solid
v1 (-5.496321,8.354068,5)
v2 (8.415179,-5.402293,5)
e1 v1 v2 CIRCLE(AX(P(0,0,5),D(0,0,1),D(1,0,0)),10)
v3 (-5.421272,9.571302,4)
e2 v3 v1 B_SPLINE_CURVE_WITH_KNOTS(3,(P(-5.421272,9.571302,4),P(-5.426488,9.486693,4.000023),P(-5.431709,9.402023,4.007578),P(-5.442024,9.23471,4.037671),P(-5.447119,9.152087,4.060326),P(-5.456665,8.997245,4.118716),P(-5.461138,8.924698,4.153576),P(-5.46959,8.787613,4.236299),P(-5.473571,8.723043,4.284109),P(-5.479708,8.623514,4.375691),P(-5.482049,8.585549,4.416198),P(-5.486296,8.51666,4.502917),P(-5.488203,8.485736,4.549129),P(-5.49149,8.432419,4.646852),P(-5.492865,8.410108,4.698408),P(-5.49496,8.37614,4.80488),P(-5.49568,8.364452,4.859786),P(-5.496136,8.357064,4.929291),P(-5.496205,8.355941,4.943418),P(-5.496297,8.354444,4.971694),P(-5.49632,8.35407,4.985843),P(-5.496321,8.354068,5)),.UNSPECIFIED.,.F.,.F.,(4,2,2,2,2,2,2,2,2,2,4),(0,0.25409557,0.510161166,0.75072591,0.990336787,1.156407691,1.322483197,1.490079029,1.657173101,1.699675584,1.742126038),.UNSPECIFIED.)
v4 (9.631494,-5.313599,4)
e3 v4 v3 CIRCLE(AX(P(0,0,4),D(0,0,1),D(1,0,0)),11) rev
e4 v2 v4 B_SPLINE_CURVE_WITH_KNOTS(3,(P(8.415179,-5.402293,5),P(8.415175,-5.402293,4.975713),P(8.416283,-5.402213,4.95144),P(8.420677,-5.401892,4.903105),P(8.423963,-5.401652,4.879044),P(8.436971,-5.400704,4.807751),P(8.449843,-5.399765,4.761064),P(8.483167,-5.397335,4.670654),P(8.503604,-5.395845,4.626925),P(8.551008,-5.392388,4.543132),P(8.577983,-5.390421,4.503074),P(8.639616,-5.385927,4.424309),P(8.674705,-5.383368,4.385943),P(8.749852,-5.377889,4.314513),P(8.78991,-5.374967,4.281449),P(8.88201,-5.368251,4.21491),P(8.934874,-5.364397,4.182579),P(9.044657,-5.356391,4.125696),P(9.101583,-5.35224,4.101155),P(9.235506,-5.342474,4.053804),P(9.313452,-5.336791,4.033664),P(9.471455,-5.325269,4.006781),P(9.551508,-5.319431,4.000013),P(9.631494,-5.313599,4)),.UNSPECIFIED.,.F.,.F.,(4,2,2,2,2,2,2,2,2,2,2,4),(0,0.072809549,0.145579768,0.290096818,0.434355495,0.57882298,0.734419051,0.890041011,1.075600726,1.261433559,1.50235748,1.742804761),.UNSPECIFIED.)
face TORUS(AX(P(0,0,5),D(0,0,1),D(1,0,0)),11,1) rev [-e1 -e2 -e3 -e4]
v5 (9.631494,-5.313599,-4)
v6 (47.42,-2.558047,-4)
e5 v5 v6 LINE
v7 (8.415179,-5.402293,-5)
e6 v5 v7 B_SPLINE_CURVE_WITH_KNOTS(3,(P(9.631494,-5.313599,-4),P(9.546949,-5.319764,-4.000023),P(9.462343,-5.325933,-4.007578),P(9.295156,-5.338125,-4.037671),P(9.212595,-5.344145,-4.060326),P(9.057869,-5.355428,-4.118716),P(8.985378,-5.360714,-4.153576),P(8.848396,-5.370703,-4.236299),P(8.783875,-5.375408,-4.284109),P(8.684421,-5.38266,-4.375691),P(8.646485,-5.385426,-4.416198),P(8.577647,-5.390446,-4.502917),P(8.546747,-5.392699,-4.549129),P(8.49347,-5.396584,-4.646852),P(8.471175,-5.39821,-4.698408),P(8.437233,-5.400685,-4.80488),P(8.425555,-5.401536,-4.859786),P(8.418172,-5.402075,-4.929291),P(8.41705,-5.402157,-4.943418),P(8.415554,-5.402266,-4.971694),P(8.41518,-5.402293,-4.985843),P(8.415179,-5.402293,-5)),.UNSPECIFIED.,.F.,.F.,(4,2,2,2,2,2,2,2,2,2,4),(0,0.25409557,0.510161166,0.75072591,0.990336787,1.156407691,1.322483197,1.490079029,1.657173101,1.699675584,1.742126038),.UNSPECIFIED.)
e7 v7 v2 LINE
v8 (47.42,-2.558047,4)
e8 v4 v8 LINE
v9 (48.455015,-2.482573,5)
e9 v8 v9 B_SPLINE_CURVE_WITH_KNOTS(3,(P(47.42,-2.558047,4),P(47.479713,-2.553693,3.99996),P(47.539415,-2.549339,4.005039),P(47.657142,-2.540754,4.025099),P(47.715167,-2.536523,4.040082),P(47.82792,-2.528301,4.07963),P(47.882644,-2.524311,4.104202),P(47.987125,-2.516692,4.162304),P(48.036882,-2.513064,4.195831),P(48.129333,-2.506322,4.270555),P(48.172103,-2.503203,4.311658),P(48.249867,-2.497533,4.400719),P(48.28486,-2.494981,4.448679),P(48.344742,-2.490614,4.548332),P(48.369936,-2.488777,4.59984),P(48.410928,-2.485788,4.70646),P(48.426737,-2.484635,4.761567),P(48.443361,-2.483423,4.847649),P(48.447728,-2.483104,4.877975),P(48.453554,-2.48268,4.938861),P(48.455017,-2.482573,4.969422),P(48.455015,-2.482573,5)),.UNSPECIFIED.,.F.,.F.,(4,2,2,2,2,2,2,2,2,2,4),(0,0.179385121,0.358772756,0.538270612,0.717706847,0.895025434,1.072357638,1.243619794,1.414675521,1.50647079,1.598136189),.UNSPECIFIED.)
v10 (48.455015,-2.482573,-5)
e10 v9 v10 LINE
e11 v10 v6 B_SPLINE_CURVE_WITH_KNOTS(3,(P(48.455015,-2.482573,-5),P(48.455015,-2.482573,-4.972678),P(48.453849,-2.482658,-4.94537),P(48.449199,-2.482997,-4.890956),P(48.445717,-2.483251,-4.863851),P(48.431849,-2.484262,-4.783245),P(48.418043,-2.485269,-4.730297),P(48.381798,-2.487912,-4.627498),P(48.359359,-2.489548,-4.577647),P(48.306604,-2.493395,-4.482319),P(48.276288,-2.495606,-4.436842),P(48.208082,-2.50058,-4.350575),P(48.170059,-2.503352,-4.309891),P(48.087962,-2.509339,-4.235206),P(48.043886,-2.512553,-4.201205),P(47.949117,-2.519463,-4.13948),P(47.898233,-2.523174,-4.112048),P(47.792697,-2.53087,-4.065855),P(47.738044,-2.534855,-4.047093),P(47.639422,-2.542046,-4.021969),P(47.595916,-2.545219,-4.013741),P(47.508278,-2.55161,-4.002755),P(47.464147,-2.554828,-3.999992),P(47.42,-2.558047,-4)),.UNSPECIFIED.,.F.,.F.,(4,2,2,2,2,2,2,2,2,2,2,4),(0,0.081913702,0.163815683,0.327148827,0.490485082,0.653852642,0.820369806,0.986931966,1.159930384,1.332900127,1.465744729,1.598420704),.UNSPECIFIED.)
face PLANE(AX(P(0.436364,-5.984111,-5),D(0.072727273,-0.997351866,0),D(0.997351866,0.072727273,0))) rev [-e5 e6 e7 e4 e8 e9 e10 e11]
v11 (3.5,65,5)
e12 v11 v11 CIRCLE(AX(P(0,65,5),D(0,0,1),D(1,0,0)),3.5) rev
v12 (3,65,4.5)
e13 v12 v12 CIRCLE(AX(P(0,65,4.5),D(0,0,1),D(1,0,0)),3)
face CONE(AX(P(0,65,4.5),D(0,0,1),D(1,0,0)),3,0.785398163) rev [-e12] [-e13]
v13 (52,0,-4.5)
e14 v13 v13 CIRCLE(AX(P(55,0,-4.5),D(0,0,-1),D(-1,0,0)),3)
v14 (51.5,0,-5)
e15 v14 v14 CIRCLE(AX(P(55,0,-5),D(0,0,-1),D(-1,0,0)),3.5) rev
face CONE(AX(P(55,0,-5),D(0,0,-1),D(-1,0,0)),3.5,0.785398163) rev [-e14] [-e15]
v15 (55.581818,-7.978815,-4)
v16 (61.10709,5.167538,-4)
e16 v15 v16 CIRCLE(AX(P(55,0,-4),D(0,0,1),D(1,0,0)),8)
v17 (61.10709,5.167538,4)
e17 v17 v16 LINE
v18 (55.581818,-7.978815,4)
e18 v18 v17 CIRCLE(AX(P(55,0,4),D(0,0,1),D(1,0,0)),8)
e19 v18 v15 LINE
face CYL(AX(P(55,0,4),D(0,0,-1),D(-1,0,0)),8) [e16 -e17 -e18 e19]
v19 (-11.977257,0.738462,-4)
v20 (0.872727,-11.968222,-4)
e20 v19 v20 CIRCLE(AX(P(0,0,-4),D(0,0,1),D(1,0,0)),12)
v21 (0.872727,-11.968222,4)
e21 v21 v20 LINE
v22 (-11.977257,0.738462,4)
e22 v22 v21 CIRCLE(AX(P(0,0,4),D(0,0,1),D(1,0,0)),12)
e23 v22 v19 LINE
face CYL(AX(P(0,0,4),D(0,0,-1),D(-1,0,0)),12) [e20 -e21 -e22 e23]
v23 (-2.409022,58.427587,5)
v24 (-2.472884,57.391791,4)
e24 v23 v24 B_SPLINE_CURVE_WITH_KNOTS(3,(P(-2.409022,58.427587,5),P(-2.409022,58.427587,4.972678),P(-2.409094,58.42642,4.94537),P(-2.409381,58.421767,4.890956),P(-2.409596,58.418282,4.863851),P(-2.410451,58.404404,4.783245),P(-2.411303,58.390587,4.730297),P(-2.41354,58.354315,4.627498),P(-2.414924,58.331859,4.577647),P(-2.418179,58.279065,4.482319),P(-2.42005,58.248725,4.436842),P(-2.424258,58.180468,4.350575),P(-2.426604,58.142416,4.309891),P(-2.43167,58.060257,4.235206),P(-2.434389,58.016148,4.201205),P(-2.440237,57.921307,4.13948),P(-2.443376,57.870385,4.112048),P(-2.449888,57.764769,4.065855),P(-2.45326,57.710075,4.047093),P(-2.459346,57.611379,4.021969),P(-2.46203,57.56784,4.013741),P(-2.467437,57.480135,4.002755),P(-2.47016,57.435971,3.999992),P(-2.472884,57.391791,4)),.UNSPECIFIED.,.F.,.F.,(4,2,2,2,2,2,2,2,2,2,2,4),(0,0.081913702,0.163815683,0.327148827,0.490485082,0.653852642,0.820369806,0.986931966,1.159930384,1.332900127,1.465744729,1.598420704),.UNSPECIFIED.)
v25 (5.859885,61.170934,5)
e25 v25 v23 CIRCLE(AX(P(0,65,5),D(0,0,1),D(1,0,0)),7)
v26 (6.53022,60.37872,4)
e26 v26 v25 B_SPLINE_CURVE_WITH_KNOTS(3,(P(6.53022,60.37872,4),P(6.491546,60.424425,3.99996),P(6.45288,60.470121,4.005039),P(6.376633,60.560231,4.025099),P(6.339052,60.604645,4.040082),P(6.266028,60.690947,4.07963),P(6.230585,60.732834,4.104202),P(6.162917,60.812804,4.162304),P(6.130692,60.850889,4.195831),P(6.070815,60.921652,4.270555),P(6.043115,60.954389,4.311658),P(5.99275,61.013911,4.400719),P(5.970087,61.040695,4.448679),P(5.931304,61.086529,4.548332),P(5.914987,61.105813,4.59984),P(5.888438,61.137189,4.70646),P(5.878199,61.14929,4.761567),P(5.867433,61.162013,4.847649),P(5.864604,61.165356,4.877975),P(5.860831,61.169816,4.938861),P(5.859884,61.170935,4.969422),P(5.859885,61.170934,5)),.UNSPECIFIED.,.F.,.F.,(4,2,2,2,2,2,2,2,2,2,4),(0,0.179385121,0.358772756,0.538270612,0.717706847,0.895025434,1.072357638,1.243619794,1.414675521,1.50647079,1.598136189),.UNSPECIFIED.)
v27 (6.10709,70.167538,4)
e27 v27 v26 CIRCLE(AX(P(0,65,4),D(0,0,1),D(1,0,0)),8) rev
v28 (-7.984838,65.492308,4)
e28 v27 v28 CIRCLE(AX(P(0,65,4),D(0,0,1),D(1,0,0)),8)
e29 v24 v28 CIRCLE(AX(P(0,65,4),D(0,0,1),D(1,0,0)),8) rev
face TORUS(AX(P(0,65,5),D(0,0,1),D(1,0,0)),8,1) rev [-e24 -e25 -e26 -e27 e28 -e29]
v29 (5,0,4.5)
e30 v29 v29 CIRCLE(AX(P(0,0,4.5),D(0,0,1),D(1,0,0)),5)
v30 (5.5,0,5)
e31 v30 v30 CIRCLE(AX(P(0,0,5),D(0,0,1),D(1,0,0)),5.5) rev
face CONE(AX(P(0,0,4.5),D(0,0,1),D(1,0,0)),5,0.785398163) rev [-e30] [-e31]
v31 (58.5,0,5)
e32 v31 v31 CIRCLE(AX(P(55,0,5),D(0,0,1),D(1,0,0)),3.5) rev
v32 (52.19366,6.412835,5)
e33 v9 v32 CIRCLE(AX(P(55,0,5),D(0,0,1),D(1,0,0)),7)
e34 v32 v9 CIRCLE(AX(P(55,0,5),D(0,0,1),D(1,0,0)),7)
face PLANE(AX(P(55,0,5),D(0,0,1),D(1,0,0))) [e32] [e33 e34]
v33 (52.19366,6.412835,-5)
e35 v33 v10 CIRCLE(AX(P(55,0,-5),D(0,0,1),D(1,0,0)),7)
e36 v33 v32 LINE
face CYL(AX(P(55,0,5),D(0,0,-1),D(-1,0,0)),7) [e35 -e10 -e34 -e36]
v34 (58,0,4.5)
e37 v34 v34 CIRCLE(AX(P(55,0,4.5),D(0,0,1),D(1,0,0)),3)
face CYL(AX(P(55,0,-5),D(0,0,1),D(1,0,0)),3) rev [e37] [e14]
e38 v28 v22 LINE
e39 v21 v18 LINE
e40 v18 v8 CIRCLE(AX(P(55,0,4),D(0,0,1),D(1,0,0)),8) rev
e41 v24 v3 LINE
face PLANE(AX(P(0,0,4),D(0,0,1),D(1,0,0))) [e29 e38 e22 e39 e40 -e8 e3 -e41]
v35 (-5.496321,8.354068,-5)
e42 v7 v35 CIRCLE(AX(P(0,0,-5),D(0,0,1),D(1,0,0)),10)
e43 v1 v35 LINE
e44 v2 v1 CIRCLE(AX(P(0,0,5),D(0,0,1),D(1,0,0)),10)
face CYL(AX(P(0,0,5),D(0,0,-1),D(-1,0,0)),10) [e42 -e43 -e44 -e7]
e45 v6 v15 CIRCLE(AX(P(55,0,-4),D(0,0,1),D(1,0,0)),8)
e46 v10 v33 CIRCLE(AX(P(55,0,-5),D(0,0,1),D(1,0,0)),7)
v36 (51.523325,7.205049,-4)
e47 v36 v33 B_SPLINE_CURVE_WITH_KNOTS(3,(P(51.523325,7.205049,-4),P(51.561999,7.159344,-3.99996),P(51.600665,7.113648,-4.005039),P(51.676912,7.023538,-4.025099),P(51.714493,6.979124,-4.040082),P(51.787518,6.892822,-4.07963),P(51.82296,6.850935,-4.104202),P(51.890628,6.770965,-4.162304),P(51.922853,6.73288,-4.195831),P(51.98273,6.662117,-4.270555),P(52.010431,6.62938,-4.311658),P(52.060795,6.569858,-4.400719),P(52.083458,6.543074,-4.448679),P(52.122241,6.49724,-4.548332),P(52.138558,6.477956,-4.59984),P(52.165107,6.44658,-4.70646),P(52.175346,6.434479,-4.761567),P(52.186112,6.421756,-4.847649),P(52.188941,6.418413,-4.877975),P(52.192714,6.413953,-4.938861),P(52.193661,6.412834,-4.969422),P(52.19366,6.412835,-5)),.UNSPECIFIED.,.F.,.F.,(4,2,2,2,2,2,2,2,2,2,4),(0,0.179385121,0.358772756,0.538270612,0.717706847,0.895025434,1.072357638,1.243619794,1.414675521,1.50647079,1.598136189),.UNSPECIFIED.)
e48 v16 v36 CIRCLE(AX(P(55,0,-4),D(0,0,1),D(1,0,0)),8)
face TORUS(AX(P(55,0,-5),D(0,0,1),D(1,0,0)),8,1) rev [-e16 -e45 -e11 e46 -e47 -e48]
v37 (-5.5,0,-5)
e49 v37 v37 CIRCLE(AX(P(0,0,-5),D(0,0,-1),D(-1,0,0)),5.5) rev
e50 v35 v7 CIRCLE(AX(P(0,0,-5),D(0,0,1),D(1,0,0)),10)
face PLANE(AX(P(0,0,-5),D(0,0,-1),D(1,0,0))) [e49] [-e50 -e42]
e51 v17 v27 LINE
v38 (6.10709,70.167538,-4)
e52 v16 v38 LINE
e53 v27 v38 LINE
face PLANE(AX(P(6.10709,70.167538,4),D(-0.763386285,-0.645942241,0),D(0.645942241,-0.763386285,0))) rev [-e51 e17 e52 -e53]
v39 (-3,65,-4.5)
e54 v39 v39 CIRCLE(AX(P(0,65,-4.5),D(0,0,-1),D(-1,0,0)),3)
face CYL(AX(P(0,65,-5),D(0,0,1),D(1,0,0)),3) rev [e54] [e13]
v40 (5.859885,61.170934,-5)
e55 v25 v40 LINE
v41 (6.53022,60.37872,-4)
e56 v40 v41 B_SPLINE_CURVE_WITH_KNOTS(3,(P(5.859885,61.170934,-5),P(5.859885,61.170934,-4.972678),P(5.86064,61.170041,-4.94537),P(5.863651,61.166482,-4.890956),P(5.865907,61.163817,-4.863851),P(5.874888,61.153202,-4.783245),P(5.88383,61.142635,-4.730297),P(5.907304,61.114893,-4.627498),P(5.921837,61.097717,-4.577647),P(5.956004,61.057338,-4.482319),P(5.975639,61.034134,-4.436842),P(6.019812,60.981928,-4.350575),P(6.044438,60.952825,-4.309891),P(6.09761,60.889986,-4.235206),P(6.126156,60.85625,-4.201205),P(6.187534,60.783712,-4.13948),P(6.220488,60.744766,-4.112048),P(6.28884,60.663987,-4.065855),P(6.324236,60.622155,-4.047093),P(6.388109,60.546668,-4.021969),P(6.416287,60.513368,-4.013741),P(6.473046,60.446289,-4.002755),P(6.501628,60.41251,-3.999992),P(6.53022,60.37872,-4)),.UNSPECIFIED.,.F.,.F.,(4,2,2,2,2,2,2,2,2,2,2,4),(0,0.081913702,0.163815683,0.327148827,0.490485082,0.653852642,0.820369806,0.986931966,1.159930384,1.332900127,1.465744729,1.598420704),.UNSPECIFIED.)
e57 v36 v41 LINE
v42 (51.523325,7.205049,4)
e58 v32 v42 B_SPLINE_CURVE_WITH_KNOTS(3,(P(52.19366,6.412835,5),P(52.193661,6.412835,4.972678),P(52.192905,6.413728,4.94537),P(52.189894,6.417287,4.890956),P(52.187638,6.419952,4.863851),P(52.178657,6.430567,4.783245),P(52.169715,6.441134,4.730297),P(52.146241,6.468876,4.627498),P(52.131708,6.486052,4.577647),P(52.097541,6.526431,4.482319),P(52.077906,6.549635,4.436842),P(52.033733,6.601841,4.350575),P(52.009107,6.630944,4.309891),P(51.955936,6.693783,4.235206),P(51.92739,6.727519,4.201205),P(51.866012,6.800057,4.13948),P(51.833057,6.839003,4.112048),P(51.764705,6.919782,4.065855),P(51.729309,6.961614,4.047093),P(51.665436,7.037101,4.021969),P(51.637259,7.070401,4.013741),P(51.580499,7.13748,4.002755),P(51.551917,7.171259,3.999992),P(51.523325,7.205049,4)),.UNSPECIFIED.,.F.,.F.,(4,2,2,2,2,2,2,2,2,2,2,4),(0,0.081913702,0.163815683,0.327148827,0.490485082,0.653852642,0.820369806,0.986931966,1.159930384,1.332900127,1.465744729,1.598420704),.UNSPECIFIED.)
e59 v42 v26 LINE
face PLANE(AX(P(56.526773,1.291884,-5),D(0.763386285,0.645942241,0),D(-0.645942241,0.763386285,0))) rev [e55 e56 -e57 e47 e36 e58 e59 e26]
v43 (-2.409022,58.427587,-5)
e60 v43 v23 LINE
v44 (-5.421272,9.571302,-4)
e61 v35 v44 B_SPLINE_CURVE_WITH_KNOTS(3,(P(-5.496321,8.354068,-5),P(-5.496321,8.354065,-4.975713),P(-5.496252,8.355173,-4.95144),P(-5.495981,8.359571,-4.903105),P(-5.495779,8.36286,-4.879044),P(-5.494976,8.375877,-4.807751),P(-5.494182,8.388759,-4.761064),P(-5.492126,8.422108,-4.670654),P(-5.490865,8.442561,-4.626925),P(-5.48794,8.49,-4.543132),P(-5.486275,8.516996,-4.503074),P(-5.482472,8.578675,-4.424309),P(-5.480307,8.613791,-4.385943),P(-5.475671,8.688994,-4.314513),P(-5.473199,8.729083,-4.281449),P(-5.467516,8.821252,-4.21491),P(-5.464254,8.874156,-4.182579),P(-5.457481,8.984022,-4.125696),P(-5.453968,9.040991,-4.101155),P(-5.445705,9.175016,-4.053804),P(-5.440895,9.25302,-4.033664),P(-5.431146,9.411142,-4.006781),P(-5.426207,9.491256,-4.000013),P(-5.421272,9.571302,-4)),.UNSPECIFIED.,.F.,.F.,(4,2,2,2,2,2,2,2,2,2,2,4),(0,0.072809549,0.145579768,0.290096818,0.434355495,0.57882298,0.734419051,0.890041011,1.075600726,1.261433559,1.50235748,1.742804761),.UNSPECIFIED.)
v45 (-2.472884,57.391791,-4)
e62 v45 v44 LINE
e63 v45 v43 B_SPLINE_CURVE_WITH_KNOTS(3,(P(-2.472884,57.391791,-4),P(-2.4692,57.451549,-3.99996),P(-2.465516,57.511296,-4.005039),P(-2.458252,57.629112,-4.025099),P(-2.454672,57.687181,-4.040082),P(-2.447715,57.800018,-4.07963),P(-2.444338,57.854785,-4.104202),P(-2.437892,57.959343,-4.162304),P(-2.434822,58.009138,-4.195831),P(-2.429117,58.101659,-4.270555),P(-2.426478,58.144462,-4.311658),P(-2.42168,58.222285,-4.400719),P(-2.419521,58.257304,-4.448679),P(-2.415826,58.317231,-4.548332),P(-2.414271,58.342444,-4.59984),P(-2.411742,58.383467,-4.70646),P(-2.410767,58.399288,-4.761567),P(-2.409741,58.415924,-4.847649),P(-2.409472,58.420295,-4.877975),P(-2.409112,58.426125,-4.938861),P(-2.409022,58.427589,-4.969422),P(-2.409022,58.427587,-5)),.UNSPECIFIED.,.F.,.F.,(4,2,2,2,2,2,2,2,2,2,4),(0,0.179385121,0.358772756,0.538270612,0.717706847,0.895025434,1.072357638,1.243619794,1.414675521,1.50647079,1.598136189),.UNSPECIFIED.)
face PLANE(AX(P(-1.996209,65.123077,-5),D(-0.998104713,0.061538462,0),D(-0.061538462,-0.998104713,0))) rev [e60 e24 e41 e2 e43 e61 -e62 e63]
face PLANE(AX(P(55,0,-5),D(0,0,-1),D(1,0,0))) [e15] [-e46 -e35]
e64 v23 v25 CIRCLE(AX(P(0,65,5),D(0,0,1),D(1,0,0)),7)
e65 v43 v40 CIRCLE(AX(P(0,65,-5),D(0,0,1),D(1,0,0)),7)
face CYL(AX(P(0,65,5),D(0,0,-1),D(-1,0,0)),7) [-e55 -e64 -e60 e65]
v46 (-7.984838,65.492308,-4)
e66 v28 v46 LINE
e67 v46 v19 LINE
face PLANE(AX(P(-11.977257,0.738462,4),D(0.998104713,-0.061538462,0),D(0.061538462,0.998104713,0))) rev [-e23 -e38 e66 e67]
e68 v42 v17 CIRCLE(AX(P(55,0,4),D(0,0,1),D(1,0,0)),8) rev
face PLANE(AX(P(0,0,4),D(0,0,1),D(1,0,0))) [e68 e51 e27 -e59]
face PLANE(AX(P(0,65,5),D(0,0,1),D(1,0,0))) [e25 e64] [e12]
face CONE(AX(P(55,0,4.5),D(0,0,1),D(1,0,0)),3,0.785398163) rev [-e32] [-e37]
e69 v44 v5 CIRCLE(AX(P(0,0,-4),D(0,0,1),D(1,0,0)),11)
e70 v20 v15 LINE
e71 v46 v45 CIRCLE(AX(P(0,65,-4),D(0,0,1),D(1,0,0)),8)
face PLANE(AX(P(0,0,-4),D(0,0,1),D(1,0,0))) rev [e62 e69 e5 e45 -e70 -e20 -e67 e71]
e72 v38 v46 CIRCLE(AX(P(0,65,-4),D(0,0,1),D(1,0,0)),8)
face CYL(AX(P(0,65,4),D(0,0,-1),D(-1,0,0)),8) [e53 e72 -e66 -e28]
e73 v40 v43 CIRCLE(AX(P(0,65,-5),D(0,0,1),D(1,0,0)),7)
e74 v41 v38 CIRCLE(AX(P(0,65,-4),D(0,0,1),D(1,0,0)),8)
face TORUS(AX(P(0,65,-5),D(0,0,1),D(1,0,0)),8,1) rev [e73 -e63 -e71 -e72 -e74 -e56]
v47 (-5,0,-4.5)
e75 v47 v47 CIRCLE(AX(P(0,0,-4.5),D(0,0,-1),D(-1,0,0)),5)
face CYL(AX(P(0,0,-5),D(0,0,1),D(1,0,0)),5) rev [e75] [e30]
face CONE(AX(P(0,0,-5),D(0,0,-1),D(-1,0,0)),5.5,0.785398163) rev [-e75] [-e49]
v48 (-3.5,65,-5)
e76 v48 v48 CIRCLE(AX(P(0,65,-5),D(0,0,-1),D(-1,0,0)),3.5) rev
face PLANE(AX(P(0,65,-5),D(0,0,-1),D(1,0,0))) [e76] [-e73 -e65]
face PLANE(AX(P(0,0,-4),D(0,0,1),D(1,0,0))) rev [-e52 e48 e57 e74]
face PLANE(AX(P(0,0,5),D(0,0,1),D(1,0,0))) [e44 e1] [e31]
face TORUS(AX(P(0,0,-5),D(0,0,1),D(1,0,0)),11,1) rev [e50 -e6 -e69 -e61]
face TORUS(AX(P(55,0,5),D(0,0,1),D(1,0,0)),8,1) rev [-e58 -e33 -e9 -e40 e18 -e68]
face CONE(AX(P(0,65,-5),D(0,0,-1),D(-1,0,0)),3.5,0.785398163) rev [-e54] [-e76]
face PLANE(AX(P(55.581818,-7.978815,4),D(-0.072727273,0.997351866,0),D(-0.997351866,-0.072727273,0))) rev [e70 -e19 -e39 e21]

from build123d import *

# Parameters (mm, degrees)
BOSS_EXTRUDE1_DEPTH     = 4
SKETCH2_R               = 10
SKETCH2_R_2             = 7
BOSS_EXTRUDE2_DEPTH     = 1
CUT_EXTRUDE1_DEPTH      = 97.555683416
CUT_EXTRUDE1_DEPTH_BACK = 97.555683416
FILLET4_R               = 1
SKETCH7_R               = 7
SKETCH7_R_2             = 10
BOSS_EXTRUDE4_DEPTH     = 10
CUT_EXTRUDE2_DEPTH      = 97.845237373
CUT_EXTRUDE2_DEPTH_BACK = 97.845237373
SKETCH5_R               = 5
SKETCH5_R_2             = 3
FILLET5_R               = 1
CHAMFER1_SIZE           = 0.5


with BuildPart() as part:
    # Sketch1 → Boss-Extrude1 (new, symmetric)
    with BuildSketch(Plane.XY):
        with BuildLine():
            Line((-11.977256554, 0.738461538), (-7.984837703, 65.492307692))
            ThreePointArc((-7.984837703, 65.492307692), (-2.5191126, 72.593027835), (6.107090283, 70.167537932))
            Line((6.107090283, 70.167537932), (61.107090283, 5.167537932))
            ThreePointArc((61.107090283, 5.167537932), (62.375094743, -3.099673778), (55.581818182, -7.978814925))
            Line((55.581818182, -7.978814925), (0.872727273, -11.968222387))
            ThreePointArc((0.872727273, -11.968222387), (-8.437570547, -8.53272543), (-11.977256554, 0.738461538))
        make_face()
    extrude(amount=BOSS_EXTRUDE1_DEPTH, both=True)

    # Sketch2 → Boss-Extrude2 (add, symmetric)
    with BuildSketch(Plane.XY.offset(4)):
        Circle(SKETCH2_R)
        with Locations((0, 65)):
            Circle(SKETCH2_R_2)
        with Locations((55, 0)):
            Circle(SKETCH2_R_2)
    boss_extrude2 = extrude(amount=BOSS_EXTRUDE2_DEPTH, both=True)

    # Mirror4: Boss-Extrude2 across plane
    add(boss_extrude2.mirror(Plane.XY))

    # Sketch4 → Cut-Extrude1 (cut, two sides: drawn at the far end of the back side and taken through both)
    with BuildSketch(Plane.XY.offset(-CUT_EXTRUDE1_DEPTH_BACK)):
        with BuildLine():
            Line((0.436363636, -5.984111194), (55.145454545, -1.994703731))
            ThreePointArc((55.145454545, -1.994703731), (56.843773686, -0.774918445), (56.526772571, 1.291884483))
            Line((56.526772571, 1.291884483), (1.526772571, 66.291884483))
            ThreePointArc((1.526772571, 66.291884483), (-0.62977815, 66.898256959), (-1.996209426, 65.123076923))
            Line((-1.996209426, 65.123076923), (-5.988628277, 0.369230769))
            ThreePointArc((-5.988628277, 0.369230769), (-4.218785273, -4.266362715), (0.436363636, -5.984111194))
        make_face()
    extrude(amount=CUT_EXTRUDE1_DEPTH + CUT_EXTRUDE1_DEPTH_BACK, mode=Mode.SUBTRACT)

    # Fillet4
    fillet4_edges = [part.edges().sort_by_distance(p)[0] for p in [
        (51.800234692, -2.23863842, 5),
        (54.360216429, 3.852359924, 5),
        (51.800234692, -2.23863842, -5),
        (54.360216429, 3.852359924, -5),
        (-2.2026157, 61.775331943, 5),
        (-2.2026157, 61.775331943, -5),
        (-4.218785273, -4.266362715, 5),
        (-4.218785273, -4.266362715, -5),
        (56.843773686, -0.774918445, 5),
        (56.843773686, -0.774918445, -5),
        (-0.62977815, 66.898256959, 5),
        (-0.62977815, 66.898256959, -5),
        (-5.742474431, 4.361649621, 5),
        (4.425771099, -5.693202103, 5),
        (-5.742474431, 4.361649621, -5),
        (4.425771099, -5.693202103, -5),
        (3.693328713, 63.731409042, 5),
        (3.693328713, 63.731409042, -5),
    ]]
    fillet(fillet4_edges, radius=FILLET4_R)

    # Sketch7 → Boss-Extrude4 (add)
    with BuildSketch(Plane.XY.offset(5)):
        with Locations((0, 65)):
            Circle(SKETCH7_R)
        Circle(SKETCH7_R_2)
        with Locations((55, 0)):
            Circle(SKETCH7_R)
    extrude(amount=-BOSS_EXTRUDE4_DEPTH)

    # Sketch5 → Cut-Extrude2 (cut, two sides: drawn at the far end of the back side and taken through both)
    with BuildSketch(Plane.XY.offset(4).offset(-CUT_EXTRUDE2_DEPTH_BACK)):
        Circle(SKETCH5_R)
        with Locations((55, 0)):
            Circle(SKETCH5_R_2)
        with Locations((0, 65)):
            Circle(SKETCH5_R_2)
    extrude(amount=CUT_EXTRUDE2_DEPTH + CUT_EXTRUDE2_DEPTH_BACK, mode=Mode.SUBTRACT)

    # Fillet5
    # the kernel refuses this fillet: 1 mm, written as the material it adds along each edge
    with BuildSketch(Plane(origin=(0, 0, 4), x_dir=(-0.3253741437230861, 0.9455853565894877, 0), z_dir=(0.9455853565894877, 0.3253741437230861, 0))) as fillet5_piece_1_section:
        with BuildLine():
            CenterArc((10 + FILLET5_R, FILLET5_R), FILLET5_R, 180, 90)
            Line((10 + FILLET5_R, 0), (10, 0))
            Line((10, 0), (10, FILLET5_R))
        make_face()
    fillet5_piece_1 = revolve(axis=Axis((0, 0, 4), (0, 0, 1)), revolution_arc=232.666036755, mode=Mode.PRIVATE)
    fillet5_piece_1 = split(fillet5_piece_1, bisect_by=Plane(origin=(-5.920427429, 1.475394066, 4.281916241), z_dir=(-0.9981047128189905, 0.0615384615384615, 0)), keep=Keep.TOP, mode=Mode.PRIVATE)
    add(fillet5_piece_1)
    with BuildSketch(Plane(origin=(0, 0, 4), x_dir=(-0.3253741437230861, 0.9455853565894877, 0), z_dir=(0.9455853565894877, 0.3253741437230861, 0))) as fillet5_piece_2_section:
        with BuildLine():
            CenterArc((10 + FILLET5_R, FILLET5_R), FILLET5_R, 180, 90)
            Line((10 + FILLET5_R, 0), (10, 0))
            Line((10, 0), (10, FILLET5_R))
        make_face()
    fillet5_piece_2 = revolve(axis=Axis((0, 0, 4), (0, 0, 1)), revolution_arc=232.666036755, mode=Mode.PRIVATE)
    fillet5_piece_2 = split(fillet5_piece_2, bisect_by=Plane(origin=(1.54169258, -5.903510192, 4.281916242), z_dir=(0.0727272727272728, -0.9973518655929074, 0)), keep=Keep.TOP, mode=Mode.PRIVATE)
    add(fillet5_piece_2)
    with BuildSketch(Plane(origin=(0, 0, -4), x_dir=(0.9491746241941357, -0.31474995279732987, 0), z_dir=(0.31474995279732987, 0.9491746241941357, 0))) as fillet5_piece_3_section:
        with BuildLine():
            CenterArc((10 + FILLET5_R, FILLET5_R), FILLET5_R, 180, 90)
            Line((10 + FILLET5_R, 0), (10, 0))
            Line((10, 0), (10, FILLET5_R))
        make_face()
    fillet5_piece_3 = revolve(axis=Axis((0, 0, -4), (0, 0, -1)), revolution_arc=232.666036755, mode=Mode.PRIVATE)
    fillet5_piece_3 = split(fillet5_piece_3, bisect_by=Plane(origin=(1.54169258, -5.903510192, -4.281916242), z_dir=(0.0727272727272728, -0.9973518655929074, 0)), keep=Keep.TOP, mode=Mode.PRIVATE)
    add(fillet5_piece_3)
    with BuildSketch(Plane(origin=(0, 0, -4), x_dir=(0.9491746241941357, -0.31474995279732987, 0), z_dir=(0.31474995279732987, 0.9491746241941357, 0))) as fillet5_piece_4_section:
        with BuildLine():
            CenterArc((10 + FILLET5_R, FILLET5_R), FILLET5_R, 180, 90)
            Line((10 + FILLET5_R, 0), (10, 0))
            Line((10, 0), (10, FILLET5_R))
        make_face()
    fillet5_piece_4 = revolve(axis=Axis((0, 0, -4), (0, 0, -1)), revolution_arc=232.666036755, mode=Mode.PRIVATE)
    fillet5_piece_4 = split(fillet5_piece_4, bisect_by=Plane(origin=(-5.920427429, 1.475394066, -4.281916241), z_dir=(-0.9981047128189905, 0.0615384615384615, 0)), keep=Keep.TOP, mode=Mode.PRIVATE)
    add(fillet5_piece_4)
    with BuildSketch(Plane(origin=(55, 0, -4), x_dir=(-0.6968311842532597, 0.7172351780637922, 0), z_dir=(-0.7172351780637922, -0.6968311842532597, 0))) as fillet5_piece_5_section:
        with BuildLine():
            CenterArc((7 + FILLET5_R, FILLET5_R), FILLET5_R, 180, 90)
            Line((7 + FILLET5_R, 0), (7, 0))
            Line((7, 0), (7, FILLET5_R))
        make_face()
    fillet5_piece_5 = revolve(axis=Axis((55, 0, -4), (0, 0, -1)), revolution_arc=313.939632046, mode=Mode.PRIVATE)
    fillet5_piece_5 = split(fillet5_piece_5, bisect_by=Plane(origin=(55.594787513, 2.39332137, -4.282249328), z_dir=(0.7633862853691147, 0.6459422414661737, 0)), keep=Keep.TOP, mode=Mode.PRIVATE)
    add(fillet5_piece_5)
    with BuildSketch(Plane(origin=(55, 0, -4), x_dir=(-0.6968311842532597, 0.7172351780637922, 0), z_dir=(-0.7172351780637922, -0.6968311842532597, 0))) as fillet5_piece_6_section:
        with BuildLine():
            CenterArc((7 + FILLET5_R, FILLET5_R), FILLET5_R, 180, 90)
            Line((7 + FILLET5_R, 0), (7, 0))
            Line((7, 0), (7, FILLET5_R))
        make_face()
    fillet5_piece_6 = revolve(axis=Axis((55, 0, -4), (0, 0, -1)), revolution_arc=313.939632046, mode=Mode.PRIVATE)
    fillet5_piece_6 = split(fillet5_piece_6, bisect_by=Plane(origin=(53.706445023, -2.099636846, -4.282249327), z_dir=(0.0727272727272728, -0.9973518655929074, 0)), keep=Keep.TOP, mode=Mode.PRIVATE)
    add(fillet5_piece_6)
    with BuildSketch(Plane(origin=(0, 65, -4), x_dir=(0.0072361398734146105, -0.9999738187971385, 0), z_dir=(0.9999738187971385, 0.0072361398734146105, 0))) as fillet5_piece_7_section:
        with BuildLine():
            CenterArc((7 + FILLET5_R, FILLET5_R), FILLET5_R, 180, 90)
            Line((7 + FILLET5_R, 0), (7, 0))
            Line((7, 0), (7, FILLET5_R))
        make_face()
    fillet5_piece_7 = revolve(axis=Axis((0, 65, -4), (0, 0, -1)), revolution_arc=324.120972818, mode=Mode.PRIVATE)
    fillet5_piece_7 = split(fillet5_piece_7, bisect_by=Plane(origin=(-2.045715715, 64.320124436, -4.281970482), z_dir=(-0.9981047128189905, 0.0615384615384615, 0)), keep=Keep.TOP, mode=Mode.PRIVATE)
    add(fillet5_piece_7)
    with BuildSketch(Plane(origin=(0, 65, -4), x_dir=(0.0072361398734146105, -0.9999738187971385, 0), z_dir=(0.9999738187971385, 0.0072361398734146105, 0))) as fillet5_piece_8_section:
        with BuildLine():
            CenterArc((7 + FILLET5_R, FILLET5_R), FILLET5_R, 180, 90)
            Line((7 + FILLET5_R, 0), (7, 0))
            Line((7, 0), (7, FILLET5_R))
        make_face()
    fillet5_piece_8 = revolve(axis=Axis((0, 65, -4), (0, 0, -1)), revolution_arc=324.120972818, mode=Mode.PRIVATE)
    fillet5_piece_8 = split(fillet5_piece_8, bisect_by=Plane(origin=(2.046418378, 65.67775762, -4.281970481), z_dir=(0.7633862853691147, 0.6459422414661737, 0)), keep=Keep.TOP, mode=Mode.PRIVATE)
    add(fillet5_piece_8)
    with BuildSketch(Plane(origin=(55, 0, 4), x_dir=(-0.696831184253259, 0.7172351780637929, 0), z_dir=(-0.7172351780637929, -0.696831184253259, 0))) as fillet5_piece_9_section:
        with BuildLine():
            CenterArc((7 + FILLET5_R, -FILLET5_R), FILLET5_R, 90, 90)
            Line((7 + FILLET5_R, 0), (7, 0))
            Line((7, 0), (7, -FILLET5_R))
        make_face()
    fillet5_piece_9 = revolve(axis=Axis((55, 0, 4), (0, 0, -1)), revolution_arc=313.939632046, mode=Mode.PRIVATE)
    fillet5_piece_9 = split(fillet5_piece_9, bisect_by=Plane(origin=(55.594787513, 2.39332137, 4.282249328), z_dir=(0.7633862853691147, 0.6459422414661737, 0)), keep=Keep.TOP, mode=Mode.PRIVATE)
    add(fillet5_piece_9)
    with BuildSketch(Plane(origin=(55, 0, 4), x_dir=(-0.696831184253259, 0.7172351780637929, 0), z_dir=(-0.7172351780637929, -0.696831184253259, 0))) as fillet5_piece_10_section:
        with BuildLine():
            CenterArc((7 + FILLET5_R, -FILLET5_R), FILLET5_R, 90, 90)
            Line((7 + FILLET5_R, 0), (7, 0))
            Line((7, 0), (7, -FILLET5_R))
        make_face()
    fillet5_piece_10 = revolve(axis=Axis((55, 0, 4), (0, 0, -1)), revolution_arc=313.939632046, mode=Mode.PRIVATE)
    fillet5_piece_10 = split(fillet5_piece_10, bisect_by=Plane(origin=(53.706445023, -2.099636846, 4.282249327), z_dir=(0.0727272727272728, -0.9973518655929074, 0)), keep=Keep.TOP, mode=Mode.PRIVATE)
    add(fillet5_piece_10)
    with BuildSketch(Plane(origin=(0, 65, 4), x_dir=(0.0072361398734146105, -0.9999738187971385, 0), z_dir=(0.9999738187971385, 0.0072361398734146105, 0))) as fillet5_piece_11_section:
        with BuildLine():
            CenterArc((7 + FILLET5_R, -FILLET5_R), FILLET5_R, 90, 90)
            Line((7 + FILLET5_R, 0), (7, 0))
            Line((7, 0), (7, -FILLET5_R))
        make_face()
    fillet5_piece_11 = revolve(axis=Axis((0, 65, 4), (0, 0, -1)), revolution_arc=324.120972818, mode=Mode.PRIVATE)
    fillet5_piece_11 = split(fillet5_piece_11, bisect_by=Plane(origin=(-2.045715715, 64.320124436, 4.281970482), z_dir=(-0.9981047128189905, 0.0615384615384615, 0)), keep=Keep.TOP, mode=Mode.PRIVATE)
    add(fillet5_piece_11)
    with BuildSketch(Plane(origin=(0, 65, 4), x_dir=(0.0072361398734146105, -0.9999738187971385, 0), z_dir=(0.9999738187971385, 0.0072361398734146105, 0))) as fillet5_piece_12_section:
        with BuildLine():
            CenterArc((7 + FILLET5_R, -FILLET5_R), FILLET5_R, 90, 90)
            Line((7 + FILLET5_R, 0), (7, 0))
            Line((7, 0), (7, -FILLET5_R))
        make_face()
    fillet5_piece_12 = revolve(axis=Axis((0, 65, 4), (0, 0, -1)), revolution_arc=324.120972818, mode=Mode.PRIVATE)
    fillet5_piece_12 = split(fillet5_piece_12, bisect_by=Plane(origin=(2.046418378, 65.67775762, 4.281970481), z_dir=(0.7633862853691147, 0.6459422414661737, 0)), keep=Keep.TOP, mode=Mode.PRIVATE)
    add(fillet5_piece_12)

    # Chamfer1
    chamfer1_edges = [part.edges().sort_by_distance(p)[0] for p in [
        (-3, 65, -5),
        (-3, 65, 5),
        (52, 0, -5),
        (52, 0, 5),
        (-5, 0, -5),
        (-5, 0, 5),
    ]]
    chamfer(chamfer1_edges, length=CHAMFER1_SIZE)


solid = part.part
